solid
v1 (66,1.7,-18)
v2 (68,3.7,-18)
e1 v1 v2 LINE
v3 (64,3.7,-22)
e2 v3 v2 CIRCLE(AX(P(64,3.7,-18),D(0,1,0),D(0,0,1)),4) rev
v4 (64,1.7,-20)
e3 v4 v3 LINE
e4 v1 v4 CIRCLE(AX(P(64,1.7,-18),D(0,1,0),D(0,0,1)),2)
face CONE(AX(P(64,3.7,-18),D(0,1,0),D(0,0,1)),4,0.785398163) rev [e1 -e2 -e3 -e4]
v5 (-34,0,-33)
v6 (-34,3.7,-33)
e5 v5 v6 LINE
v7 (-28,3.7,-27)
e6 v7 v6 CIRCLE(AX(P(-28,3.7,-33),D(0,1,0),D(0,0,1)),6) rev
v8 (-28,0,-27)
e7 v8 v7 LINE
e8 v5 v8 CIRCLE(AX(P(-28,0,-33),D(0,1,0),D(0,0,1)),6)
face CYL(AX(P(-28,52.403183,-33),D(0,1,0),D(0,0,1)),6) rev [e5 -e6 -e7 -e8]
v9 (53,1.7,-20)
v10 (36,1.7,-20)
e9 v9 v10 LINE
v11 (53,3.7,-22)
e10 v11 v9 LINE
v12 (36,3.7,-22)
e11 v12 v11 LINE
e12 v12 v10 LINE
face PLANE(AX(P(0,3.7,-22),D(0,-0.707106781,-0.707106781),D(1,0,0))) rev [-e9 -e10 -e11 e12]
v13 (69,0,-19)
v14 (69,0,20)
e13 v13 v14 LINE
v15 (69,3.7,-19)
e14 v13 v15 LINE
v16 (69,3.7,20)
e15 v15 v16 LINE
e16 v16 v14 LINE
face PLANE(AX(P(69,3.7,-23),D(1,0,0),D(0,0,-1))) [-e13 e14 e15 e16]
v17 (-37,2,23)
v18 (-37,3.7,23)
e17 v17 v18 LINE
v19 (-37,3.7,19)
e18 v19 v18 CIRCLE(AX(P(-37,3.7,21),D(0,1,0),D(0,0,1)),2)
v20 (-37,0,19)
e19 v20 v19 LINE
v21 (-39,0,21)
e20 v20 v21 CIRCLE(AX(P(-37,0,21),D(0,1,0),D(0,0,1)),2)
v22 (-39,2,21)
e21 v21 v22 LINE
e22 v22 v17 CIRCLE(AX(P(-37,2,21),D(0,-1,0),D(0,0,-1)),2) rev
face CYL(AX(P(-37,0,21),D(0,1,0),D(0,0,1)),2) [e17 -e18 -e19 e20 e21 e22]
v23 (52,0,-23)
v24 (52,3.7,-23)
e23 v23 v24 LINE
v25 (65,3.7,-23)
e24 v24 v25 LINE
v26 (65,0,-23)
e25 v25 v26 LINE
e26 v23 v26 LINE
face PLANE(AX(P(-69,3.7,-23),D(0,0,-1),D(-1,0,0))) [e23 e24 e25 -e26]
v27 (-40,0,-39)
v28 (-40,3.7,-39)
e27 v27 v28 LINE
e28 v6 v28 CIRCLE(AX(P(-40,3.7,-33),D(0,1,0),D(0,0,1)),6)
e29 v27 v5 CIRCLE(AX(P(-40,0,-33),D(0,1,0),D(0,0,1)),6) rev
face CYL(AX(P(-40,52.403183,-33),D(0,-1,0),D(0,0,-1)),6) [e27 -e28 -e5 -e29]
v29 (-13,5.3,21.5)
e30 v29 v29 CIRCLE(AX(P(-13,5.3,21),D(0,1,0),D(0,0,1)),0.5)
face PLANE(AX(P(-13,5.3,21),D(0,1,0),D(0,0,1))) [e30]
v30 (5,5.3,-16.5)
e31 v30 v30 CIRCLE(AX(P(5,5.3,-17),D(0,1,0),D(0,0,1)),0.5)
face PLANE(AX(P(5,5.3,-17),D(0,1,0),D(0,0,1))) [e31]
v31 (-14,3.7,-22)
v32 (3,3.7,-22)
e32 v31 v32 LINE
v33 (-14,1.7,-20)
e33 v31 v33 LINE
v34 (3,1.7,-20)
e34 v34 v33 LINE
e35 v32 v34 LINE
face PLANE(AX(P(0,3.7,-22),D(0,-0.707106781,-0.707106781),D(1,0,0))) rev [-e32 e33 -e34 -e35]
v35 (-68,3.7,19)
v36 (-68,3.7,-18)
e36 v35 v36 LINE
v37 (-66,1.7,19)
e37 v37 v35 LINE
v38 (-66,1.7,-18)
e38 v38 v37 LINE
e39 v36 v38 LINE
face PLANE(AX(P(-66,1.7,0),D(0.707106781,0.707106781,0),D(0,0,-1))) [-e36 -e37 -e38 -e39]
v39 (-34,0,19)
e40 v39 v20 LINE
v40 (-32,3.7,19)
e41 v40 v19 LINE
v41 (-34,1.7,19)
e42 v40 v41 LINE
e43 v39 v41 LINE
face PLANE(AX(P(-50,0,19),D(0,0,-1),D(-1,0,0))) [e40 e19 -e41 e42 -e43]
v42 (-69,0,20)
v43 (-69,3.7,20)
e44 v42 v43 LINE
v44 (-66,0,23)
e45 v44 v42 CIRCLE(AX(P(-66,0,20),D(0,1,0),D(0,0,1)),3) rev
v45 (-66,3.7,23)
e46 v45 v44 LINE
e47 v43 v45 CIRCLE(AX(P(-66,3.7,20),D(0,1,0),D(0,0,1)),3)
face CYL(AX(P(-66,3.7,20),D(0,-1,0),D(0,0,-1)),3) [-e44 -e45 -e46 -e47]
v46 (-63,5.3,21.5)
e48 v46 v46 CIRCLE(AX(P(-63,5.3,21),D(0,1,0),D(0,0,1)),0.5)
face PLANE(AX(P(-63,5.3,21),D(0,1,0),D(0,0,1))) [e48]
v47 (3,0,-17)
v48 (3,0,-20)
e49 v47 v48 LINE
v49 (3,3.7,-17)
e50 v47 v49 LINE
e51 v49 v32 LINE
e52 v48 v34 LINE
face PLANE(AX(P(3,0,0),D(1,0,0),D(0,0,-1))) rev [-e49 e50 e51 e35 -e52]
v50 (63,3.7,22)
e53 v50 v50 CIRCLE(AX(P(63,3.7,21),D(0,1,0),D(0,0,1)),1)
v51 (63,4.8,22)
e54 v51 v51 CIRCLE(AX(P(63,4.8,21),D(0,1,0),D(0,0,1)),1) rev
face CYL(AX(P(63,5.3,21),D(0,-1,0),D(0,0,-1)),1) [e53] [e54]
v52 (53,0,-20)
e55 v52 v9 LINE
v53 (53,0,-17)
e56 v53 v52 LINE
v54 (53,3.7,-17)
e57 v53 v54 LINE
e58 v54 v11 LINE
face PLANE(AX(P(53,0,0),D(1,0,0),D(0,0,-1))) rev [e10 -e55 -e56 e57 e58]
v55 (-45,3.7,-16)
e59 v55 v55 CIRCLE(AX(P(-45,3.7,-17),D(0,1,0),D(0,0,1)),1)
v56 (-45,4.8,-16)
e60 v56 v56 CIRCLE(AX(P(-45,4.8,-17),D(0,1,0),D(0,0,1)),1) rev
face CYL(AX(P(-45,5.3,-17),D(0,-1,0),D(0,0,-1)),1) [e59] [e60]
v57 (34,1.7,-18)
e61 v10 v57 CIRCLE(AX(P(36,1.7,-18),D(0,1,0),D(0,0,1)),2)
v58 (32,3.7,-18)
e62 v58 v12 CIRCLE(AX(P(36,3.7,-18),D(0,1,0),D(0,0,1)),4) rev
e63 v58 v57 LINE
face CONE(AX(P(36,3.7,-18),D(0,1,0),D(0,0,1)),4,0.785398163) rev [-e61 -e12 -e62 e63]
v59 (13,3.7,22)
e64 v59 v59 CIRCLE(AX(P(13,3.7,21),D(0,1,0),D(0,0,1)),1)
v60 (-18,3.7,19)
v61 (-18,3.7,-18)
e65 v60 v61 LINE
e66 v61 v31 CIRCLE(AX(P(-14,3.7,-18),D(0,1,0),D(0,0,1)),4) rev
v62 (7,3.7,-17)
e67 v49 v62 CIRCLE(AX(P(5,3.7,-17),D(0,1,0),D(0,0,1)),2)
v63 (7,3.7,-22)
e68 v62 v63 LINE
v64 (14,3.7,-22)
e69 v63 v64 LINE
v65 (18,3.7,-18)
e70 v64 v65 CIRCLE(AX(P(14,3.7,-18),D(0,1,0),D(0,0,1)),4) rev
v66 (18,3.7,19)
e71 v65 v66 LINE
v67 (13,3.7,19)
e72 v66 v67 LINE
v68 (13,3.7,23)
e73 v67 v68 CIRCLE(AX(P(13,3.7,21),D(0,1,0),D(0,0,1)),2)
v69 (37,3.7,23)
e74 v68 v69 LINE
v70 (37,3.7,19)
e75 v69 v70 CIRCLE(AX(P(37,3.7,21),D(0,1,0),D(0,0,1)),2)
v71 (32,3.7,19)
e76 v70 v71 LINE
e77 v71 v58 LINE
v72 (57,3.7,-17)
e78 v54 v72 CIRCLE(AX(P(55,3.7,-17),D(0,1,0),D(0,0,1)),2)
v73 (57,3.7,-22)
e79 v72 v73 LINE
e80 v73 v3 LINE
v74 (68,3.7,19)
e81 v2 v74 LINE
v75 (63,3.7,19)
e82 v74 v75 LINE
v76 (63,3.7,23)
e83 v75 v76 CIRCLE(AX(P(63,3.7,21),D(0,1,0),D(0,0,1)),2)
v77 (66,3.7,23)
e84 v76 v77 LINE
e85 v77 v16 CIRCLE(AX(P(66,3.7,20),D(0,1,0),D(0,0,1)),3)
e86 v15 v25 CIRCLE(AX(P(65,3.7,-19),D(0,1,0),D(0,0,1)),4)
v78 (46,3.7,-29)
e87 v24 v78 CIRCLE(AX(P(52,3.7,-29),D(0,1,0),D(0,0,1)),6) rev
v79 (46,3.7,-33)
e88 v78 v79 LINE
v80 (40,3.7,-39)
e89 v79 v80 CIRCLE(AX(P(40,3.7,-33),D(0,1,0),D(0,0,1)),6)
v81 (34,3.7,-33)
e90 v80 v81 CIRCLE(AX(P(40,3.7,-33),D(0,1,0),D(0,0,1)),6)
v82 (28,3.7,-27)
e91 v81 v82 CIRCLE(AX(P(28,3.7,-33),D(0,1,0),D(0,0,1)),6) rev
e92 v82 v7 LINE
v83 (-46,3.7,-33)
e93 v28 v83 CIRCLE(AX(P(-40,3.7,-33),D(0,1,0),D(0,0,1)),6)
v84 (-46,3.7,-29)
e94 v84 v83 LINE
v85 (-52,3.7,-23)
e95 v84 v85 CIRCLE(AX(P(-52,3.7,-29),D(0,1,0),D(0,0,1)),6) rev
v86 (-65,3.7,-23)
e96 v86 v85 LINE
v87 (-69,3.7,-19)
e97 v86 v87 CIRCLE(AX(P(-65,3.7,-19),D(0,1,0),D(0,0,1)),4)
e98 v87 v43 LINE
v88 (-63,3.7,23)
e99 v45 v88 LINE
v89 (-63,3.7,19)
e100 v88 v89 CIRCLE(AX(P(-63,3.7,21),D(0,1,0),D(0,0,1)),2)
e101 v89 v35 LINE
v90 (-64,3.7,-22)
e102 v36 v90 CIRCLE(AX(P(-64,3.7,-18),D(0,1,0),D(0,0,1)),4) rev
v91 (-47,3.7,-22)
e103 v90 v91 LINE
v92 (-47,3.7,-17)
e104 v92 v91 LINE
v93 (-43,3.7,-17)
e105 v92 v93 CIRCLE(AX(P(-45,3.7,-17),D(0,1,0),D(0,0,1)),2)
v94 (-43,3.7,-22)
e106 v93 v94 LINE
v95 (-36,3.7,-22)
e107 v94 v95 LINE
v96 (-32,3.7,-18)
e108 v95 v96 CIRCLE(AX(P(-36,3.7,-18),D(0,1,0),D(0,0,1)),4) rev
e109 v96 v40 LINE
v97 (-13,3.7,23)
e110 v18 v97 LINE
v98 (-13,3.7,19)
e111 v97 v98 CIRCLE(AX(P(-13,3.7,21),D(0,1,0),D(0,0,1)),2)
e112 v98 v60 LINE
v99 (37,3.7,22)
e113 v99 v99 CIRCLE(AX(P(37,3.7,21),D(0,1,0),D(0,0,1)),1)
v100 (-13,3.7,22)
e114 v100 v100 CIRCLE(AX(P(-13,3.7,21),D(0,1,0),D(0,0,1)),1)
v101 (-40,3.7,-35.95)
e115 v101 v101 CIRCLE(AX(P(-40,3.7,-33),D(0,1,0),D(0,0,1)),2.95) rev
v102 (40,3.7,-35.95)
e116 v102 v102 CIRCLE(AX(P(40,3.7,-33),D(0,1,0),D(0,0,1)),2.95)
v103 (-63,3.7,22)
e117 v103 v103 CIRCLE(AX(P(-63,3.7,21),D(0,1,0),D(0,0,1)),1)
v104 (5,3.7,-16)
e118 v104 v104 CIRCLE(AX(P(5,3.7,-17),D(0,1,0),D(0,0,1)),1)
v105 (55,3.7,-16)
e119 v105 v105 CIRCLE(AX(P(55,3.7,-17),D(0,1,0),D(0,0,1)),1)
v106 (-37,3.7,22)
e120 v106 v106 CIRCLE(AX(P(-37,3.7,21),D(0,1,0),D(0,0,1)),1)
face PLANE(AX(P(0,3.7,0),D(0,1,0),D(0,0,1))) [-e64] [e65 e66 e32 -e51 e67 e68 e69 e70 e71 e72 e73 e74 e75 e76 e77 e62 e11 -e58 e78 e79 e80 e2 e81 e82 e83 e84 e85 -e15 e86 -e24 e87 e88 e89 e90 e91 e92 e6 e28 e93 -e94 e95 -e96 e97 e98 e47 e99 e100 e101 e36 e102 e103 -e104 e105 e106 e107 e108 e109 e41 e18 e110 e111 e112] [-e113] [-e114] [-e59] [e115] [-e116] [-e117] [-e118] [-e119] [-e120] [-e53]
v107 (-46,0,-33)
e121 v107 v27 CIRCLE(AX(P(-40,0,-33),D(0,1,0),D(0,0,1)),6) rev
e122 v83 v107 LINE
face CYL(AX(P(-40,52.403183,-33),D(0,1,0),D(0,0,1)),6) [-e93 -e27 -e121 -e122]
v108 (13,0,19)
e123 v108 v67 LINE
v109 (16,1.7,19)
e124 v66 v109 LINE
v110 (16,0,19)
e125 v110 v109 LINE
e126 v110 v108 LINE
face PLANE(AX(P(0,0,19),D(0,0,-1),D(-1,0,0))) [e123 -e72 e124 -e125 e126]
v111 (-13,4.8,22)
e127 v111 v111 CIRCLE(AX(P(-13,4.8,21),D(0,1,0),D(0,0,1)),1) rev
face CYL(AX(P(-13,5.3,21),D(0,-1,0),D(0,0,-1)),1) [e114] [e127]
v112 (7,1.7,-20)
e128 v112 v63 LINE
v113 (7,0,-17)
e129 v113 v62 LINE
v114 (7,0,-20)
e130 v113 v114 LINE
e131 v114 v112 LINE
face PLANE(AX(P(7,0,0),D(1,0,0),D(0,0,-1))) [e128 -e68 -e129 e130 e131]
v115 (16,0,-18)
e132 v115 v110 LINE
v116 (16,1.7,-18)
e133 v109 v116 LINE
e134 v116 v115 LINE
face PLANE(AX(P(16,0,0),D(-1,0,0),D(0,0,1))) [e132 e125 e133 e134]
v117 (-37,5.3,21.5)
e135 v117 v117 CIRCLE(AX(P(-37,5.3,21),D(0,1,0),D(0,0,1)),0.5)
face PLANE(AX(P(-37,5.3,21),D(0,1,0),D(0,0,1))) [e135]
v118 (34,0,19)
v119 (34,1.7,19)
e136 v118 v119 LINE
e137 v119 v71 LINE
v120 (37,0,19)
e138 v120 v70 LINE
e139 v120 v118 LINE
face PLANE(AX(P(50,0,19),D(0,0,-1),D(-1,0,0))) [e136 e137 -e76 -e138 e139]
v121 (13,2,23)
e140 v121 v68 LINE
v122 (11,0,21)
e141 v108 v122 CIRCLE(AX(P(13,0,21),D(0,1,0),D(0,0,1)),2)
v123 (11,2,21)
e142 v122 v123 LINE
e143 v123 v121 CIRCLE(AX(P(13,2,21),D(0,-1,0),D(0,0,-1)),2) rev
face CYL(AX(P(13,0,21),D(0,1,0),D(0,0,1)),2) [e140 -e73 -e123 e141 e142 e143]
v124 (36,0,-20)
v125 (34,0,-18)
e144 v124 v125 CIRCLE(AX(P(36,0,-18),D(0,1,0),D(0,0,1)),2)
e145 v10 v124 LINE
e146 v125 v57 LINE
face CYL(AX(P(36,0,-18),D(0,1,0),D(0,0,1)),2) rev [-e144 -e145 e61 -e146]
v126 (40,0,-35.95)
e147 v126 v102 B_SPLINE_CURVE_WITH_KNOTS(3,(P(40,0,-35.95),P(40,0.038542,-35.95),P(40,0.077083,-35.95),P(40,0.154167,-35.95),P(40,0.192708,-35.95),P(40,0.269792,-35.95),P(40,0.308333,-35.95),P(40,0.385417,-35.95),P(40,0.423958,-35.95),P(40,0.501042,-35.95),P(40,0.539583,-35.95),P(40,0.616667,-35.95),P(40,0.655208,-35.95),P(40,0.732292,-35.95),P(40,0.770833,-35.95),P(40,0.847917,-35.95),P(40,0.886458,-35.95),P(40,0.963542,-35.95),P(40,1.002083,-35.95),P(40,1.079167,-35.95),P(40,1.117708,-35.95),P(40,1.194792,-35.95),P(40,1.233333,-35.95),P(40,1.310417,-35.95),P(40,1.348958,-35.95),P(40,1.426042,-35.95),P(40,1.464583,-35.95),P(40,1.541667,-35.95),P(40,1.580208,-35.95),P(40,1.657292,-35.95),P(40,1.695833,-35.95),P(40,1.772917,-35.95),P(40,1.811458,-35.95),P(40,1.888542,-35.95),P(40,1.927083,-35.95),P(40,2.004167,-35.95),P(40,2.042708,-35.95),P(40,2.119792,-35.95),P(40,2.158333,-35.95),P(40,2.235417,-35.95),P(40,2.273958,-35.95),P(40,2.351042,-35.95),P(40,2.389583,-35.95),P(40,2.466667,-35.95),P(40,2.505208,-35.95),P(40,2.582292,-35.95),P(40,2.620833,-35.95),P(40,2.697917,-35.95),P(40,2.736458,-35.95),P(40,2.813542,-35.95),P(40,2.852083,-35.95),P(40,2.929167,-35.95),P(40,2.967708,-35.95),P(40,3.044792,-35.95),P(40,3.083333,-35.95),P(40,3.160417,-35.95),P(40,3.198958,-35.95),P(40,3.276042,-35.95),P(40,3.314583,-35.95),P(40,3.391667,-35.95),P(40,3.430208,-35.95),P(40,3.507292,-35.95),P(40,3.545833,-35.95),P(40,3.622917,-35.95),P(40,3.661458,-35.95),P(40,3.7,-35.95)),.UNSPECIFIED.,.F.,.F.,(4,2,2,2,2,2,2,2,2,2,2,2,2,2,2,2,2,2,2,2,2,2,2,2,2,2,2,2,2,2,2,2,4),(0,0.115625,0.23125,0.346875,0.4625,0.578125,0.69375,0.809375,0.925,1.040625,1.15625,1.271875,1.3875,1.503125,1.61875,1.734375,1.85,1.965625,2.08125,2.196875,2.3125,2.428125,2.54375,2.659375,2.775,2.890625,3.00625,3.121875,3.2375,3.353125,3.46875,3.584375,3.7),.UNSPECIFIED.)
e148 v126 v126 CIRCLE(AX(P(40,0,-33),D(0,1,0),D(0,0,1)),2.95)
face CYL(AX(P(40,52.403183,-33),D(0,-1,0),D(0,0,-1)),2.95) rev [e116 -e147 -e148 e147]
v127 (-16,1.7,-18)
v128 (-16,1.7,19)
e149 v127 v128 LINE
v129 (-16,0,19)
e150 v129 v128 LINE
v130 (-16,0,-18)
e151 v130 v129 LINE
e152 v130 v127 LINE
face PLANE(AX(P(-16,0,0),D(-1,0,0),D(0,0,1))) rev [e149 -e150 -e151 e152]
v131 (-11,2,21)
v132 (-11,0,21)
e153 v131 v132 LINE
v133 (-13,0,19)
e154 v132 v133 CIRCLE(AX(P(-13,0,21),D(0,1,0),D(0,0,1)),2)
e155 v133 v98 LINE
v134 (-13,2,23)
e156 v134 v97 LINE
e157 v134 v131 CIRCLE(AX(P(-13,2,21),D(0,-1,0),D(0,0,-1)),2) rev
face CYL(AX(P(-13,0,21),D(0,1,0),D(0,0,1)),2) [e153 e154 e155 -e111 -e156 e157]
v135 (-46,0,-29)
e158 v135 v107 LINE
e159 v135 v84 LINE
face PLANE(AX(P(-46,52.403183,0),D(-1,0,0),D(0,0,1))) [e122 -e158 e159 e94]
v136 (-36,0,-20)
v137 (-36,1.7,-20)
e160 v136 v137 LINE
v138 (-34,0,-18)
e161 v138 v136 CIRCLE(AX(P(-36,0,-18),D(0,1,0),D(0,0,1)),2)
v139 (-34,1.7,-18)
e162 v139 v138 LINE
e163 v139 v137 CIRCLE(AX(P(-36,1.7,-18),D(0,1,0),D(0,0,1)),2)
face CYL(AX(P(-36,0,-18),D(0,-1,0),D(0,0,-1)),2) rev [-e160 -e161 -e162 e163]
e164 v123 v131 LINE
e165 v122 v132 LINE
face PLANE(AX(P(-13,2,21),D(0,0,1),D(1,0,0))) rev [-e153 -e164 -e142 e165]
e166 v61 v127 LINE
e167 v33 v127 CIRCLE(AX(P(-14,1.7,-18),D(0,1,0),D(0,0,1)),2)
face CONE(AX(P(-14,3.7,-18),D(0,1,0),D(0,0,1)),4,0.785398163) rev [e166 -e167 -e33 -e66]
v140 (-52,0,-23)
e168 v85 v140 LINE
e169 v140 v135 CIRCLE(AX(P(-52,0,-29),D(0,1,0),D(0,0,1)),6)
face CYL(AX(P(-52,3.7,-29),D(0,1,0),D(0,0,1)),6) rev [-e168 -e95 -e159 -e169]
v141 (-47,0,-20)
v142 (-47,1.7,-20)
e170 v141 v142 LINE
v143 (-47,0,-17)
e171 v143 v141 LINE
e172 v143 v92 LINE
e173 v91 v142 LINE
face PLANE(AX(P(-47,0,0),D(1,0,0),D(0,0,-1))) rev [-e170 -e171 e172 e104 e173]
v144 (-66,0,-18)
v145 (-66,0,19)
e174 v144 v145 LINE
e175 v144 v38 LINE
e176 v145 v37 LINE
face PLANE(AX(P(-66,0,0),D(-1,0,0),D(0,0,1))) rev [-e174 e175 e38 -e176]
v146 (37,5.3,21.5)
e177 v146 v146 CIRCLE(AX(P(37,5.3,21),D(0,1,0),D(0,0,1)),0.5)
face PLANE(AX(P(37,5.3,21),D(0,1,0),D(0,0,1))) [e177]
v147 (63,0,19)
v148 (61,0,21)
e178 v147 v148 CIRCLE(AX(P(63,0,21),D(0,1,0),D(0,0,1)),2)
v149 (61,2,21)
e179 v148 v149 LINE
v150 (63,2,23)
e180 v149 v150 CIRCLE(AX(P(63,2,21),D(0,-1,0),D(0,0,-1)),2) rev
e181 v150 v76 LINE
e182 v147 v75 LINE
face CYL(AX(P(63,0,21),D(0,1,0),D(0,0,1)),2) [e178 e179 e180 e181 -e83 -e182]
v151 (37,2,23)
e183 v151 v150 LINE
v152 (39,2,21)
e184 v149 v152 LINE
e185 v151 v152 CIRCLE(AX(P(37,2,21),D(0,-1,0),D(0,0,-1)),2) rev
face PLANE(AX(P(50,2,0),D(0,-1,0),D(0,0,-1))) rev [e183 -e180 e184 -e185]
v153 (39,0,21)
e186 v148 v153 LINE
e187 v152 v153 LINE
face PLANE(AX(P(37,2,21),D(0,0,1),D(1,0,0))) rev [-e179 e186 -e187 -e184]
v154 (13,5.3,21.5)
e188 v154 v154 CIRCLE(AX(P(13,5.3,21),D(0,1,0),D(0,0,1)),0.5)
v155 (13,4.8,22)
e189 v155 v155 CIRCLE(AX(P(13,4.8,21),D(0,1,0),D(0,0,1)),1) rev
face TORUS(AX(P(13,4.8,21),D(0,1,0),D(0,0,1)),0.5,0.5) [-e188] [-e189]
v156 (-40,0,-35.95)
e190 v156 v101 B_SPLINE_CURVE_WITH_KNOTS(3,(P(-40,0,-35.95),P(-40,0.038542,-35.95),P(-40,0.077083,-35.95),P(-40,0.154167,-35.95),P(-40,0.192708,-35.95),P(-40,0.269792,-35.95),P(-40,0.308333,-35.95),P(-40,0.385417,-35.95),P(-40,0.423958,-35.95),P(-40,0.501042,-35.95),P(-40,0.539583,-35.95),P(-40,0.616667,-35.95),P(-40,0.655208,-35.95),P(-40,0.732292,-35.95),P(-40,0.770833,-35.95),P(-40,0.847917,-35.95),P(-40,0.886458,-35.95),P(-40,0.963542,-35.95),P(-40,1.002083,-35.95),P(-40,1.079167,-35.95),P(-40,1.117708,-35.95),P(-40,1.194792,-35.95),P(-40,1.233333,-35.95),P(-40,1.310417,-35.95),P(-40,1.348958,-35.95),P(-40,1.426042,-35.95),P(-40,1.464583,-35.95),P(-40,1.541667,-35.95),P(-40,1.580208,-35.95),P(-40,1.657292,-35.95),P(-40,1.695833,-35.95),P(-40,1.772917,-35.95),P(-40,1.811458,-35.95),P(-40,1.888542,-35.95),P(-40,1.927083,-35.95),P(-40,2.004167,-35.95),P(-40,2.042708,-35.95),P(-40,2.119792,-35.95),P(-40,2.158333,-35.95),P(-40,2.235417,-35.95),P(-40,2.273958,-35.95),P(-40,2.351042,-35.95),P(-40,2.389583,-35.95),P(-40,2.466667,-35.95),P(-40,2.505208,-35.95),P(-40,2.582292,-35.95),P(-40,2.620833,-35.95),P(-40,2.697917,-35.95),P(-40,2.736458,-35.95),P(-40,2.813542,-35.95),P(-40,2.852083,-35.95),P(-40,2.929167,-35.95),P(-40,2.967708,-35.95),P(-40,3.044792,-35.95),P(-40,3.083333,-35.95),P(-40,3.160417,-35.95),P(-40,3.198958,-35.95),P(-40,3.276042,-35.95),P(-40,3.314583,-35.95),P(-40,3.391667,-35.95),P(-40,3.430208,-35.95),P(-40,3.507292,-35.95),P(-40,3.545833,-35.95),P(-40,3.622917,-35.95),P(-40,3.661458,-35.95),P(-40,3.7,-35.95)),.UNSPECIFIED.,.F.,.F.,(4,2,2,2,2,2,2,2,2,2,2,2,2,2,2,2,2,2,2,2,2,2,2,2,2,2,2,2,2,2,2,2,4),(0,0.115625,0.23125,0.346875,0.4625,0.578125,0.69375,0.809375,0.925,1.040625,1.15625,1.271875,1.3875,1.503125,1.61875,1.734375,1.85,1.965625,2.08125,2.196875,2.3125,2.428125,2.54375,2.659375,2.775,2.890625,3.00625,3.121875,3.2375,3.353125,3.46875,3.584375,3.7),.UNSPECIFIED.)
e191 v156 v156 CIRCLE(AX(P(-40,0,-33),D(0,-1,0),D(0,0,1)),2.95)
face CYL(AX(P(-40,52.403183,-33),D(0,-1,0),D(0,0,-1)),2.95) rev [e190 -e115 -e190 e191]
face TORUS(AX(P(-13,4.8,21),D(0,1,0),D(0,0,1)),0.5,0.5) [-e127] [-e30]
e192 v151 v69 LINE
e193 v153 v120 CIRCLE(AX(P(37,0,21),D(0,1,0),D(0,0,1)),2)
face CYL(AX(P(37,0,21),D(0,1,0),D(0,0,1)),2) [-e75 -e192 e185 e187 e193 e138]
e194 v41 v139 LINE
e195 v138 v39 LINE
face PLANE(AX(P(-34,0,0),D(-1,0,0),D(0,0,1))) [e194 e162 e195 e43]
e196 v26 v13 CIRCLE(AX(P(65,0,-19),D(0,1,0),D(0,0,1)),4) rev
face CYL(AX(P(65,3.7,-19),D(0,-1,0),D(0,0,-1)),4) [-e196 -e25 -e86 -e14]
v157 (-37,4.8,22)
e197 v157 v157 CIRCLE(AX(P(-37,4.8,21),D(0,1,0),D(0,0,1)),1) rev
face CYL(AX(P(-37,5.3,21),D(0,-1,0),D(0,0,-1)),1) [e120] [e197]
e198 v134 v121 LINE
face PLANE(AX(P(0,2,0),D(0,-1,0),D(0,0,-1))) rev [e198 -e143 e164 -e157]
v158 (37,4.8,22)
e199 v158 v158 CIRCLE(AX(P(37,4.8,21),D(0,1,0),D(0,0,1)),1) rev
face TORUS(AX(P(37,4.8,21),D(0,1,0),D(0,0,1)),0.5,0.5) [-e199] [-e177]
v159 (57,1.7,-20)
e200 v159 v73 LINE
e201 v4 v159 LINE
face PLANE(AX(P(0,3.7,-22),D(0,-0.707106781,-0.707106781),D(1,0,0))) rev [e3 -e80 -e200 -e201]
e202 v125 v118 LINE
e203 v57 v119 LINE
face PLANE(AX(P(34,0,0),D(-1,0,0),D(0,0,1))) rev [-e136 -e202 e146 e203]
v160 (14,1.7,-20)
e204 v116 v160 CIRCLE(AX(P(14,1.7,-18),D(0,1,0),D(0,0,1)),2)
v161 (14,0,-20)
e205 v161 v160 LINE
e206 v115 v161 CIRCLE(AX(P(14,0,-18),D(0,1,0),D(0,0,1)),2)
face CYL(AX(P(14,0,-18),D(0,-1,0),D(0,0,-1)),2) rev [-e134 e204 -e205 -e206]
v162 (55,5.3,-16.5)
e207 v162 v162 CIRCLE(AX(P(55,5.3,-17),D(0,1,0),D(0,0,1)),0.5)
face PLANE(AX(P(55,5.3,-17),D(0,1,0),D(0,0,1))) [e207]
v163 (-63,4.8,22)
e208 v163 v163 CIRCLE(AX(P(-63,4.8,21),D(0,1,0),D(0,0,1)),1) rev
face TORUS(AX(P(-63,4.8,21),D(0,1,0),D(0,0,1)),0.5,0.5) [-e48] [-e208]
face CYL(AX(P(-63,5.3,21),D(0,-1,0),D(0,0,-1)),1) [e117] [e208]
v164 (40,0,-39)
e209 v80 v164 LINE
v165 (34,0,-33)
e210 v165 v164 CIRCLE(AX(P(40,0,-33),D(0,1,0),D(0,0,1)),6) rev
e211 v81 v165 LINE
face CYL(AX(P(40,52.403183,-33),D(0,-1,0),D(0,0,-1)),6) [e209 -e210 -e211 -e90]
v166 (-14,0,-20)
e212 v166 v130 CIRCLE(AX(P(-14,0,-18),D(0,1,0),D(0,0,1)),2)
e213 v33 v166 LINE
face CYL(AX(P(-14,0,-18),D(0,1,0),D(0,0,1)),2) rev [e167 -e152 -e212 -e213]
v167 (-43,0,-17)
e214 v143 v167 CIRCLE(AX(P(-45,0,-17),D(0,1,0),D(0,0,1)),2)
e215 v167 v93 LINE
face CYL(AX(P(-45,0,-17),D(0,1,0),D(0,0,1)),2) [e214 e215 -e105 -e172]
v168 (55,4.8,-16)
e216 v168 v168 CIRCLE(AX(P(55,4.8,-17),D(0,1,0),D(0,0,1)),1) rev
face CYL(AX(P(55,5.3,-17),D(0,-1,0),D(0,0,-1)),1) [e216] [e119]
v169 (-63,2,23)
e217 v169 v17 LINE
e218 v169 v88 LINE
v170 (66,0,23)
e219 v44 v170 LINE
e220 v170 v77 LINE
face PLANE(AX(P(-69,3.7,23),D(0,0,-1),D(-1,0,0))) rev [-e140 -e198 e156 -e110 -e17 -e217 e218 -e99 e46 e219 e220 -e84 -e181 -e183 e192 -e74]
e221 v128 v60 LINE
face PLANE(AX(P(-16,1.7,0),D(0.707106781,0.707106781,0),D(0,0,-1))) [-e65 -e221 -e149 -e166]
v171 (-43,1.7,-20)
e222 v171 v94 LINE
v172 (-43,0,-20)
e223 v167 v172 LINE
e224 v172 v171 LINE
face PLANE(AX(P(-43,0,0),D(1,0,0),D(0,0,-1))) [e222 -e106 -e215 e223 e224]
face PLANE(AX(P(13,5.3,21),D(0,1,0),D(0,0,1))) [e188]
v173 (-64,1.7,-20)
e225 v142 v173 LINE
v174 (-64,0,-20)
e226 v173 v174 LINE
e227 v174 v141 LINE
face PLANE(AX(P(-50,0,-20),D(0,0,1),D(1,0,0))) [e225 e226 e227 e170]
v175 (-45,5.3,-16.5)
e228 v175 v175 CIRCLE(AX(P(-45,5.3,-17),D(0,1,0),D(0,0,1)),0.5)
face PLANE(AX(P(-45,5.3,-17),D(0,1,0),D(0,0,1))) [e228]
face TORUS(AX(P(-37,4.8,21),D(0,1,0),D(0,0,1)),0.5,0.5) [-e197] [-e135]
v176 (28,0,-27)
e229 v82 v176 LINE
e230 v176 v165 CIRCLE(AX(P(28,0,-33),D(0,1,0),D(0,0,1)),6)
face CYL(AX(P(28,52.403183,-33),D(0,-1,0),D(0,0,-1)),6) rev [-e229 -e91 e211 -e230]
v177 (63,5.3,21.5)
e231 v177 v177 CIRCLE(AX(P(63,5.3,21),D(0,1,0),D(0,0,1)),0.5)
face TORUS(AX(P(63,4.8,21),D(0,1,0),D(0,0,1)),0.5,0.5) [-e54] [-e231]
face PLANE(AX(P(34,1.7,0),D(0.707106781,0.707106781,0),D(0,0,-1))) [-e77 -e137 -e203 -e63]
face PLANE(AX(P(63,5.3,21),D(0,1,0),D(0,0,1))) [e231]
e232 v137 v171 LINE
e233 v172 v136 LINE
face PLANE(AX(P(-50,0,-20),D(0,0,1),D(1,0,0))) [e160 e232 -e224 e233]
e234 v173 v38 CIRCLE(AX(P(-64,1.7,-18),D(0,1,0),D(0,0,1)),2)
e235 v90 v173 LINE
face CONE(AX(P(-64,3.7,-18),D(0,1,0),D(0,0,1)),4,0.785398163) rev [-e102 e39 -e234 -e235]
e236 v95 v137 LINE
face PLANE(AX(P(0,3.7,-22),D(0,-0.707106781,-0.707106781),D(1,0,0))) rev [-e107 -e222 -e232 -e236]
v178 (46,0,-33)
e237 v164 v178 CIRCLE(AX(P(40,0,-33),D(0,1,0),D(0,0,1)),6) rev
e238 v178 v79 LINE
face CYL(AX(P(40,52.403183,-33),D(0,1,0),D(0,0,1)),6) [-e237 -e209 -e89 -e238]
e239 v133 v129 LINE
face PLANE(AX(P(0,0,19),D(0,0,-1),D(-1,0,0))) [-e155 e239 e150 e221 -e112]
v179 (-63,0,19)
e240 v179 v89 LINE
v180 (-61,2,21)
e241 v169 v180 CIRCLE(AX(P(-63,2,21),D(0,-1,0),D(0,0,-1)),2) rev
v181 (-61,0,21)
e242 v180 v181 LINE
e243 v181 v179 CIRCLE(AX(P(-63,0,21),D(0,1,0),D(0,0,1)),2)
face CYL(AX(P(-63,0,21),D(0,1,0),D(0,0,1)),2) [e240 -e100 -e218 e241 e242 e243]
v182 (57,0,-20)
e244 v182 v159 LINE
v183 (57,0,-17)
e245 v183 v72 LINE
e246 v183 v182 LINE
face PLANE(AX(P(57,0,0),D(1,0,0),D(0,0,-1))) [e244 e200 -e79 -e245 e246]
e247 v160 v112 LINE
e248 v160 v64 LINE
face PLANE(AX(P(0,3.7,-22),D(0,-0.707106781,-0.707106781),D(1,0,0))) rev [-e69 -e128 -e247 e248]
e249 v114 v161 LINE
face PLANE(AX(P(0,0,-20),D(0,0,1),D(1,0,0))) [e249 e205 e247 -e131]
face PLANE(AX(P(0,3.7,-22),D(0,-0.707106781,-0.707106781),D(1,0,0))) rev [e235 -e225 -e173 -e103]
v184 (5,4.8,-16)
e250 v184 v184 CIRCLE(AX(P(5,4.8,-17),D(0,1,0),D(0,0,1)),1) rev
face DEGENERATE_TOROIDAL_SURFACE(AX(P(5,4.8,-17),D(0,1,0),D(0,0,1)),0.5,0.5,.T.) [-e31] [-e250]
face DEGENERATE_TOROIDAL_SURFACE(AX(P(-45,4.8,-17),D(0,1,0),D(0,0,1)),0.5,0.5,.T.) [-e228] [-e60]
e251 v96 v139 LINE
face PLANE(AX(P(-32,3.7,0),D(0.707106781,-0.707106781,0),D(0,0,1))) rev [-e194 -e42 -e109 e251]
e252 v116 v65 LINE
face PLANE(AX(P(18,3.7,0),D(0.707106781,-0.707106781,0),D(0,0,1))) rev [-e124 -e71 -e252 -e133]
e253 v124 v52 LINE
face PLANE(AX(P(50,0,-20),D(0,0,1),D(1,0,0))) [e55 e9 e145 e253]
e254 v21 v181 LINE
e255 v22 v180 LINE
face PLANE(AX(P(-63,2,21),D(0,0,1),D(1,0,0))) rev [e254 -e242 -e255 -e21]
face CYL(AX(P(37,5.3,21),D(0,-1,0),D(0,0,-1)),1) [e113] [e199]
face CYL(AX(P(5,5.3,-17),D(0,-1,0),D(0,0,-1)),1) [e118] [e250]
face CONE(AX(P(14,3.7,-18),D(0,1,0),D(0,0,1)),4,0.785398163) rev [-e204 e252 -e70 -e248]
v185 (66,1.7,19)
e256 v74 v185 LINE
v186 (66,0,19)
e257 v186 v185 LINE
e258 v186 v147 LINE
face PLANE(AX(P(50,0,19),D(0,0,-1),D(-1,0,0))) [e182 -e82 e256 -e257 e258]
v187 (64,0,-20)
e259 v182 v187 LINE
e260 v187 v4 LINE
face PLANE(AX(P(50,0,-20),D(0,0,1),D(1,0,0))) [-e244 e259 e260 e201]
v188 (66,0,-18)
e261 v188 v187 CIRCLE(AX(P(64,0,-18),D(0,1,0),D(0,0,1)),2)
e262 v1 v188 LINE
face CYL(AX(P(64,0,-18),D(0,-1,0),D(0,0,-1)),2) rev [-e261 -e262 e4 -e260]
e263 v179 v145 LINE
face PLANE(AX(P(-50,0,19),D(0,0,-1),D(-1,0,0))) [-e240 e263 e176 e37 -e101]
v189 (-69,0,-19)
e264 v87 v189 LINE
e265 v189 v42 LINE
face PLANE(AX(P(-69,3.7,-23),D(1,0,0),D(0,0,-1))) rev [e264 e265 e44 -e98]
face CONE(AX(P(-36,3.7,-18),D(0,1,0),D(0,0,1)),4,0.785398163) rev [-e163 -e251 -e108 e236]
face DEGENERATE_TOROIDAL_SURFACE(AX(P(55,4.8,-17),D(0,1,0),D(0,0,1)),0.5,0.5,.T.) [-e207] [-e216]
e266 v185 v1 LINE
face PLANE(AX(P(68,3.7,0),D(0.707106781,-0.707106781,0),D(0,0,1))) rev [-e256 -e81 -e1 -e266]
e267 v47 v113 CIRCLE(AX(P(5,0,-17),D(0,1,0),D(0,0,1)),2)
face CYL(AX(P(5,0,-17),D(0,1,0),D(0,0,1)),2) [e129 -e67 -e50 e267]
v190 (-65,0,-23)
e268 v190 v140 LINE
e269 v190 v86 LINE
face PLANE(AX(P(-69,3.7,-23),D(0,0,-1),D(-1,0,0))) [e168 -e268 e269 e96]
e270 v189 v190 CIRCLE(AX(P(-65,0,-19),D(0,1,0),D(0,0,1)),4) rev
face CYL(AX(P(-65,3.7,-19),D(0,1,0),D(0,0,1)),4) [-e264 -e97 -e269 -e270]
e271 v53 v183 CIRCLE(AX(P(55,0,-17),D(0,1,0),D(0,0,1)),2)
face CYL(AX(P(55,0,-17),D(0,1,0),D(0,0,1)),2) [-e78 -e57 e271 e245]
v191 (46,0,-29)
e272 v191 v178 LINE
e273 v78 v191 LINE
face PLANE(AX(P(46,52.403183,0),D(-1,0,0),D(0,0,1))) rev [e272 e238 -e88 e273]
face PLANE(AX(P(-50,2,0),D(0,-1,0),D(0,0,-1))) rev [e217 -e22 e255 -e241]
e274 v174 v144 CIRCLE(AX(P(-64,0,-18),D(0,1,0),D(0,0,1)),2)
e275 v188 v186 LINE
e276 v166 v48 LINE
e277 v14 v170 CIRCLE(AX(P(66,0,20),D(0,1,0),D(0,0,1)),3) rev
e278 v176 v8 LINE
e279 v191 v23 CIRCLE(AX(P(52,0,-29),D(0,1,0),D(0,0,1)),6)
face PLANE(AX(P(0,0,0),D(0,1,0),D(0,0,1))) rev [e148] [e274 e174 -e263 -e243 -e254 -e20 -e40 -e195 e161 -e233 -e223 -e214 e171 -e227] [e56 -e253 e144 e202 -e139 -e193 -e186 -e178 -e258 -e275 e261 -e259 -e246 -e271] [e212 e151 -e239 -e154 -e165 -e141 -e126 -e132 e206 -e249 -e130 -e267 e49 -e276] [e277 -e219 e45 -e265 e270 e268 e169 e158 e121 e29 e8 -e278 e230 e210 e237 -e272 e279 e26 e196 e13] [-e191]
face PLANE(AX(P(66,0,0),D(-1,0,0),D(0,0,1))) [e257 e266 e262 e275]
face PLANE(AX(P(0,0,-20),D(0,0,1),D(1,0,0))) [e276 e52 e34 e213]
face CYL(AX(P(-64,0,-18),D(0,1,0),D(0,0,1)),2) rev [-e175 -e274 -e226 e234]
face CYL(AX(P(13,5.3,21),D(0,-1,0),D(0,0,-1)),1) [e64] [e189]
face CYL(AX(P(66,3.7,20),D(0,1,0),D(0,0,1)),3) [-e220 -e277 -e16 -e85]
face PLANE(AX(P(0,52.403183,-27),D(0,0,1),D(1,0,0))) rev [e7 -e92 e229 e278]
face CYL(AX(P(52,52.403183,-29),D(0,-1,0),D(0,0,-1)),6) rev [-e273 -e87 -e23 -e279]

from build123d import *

# Parameters (mm, degrees)
SKETCH1_W                  = 138
SKETCH1_H                  = 46
BOSS_EXTRUDE1_DEPTH        = 3.7
SKETCH2_W                  = 34
SKETCH2_H                  = 4
BOSS_EXTRUDE2_DEPTH        = 3.7
FILLET1_R                  = 6
FILLET1_OF_MIRROR1_R       = 6
CUT_EXTRUDE1_DEPTH         = 80.345384239
FILLET2_R                  = 2
SKETCH4_R                  = 1
BOSS_EXTRUDE3_DEPTH        = 1.6
FILLET3_R                  = 0.5
SKETCH5_W                  = 26
SKETCH5_H                  = 2
BOSS_EXTRUDE4_DEPTH        = 2
LPATTERN1_COUNT            = 2
LPATTERN1_PITCH            = 50
FILLET2_OF_LPATTERN1_R     = 2
FILLET3_OF_LPATTERN1_R     = 0.5
LPATTERN1_COL_COUNT        = 2
LPATTERN1_COL_PITCH        = 50
FILLET2_OF_LPATTERN1_COL_R = 2
FILLET3_OF_LPATTERN1_COL_R = 0.5
FILLET4_R                  = 4
FILLET5_R                  = 3
CHAMFER1_SIZE              = 2


with BuildPart() as part:
    # Sketch1 → Boss-Extrude1 (new body)
    with BuildSketch(Plane(origin=(0, 0, 0), x_dir=(1, 0, 0), z_dir=(0, 1, 0))):
        Rectangle(SKETCH1_W, SKETCH1_H)
    extrude(amount=BOSS_EXTRUDE1_DEPTH)

    # Sketch2 → Boss-Extrude2 (add)
    with BuildSketch(Plane(origin=(0, 0, 0), x_dir=(1, 0, 0), z_dir=(0, 1, 0))):
        with Locations((17, 25)):
            Rectangle(SKETCH2_W, SKETCH2_H)
        with BuildLine():
            Line((34, 27), (34, 23))
            Line((34, 23), (40, 23))
            Line((40, 23), (40, 30.05))
            ThreePointArc((40, 30.05), (37.05, 33), (40, 35.95))
            Line((40, 35.95), (40, 39))
            Line((40, 39), (34, 39))
            Line((34, 39), (34, 27))
        make_face()
        with BuildLine():
            Line((40, 30.05), (40, 23))
            Line((40, 23), (46, 23))
            Line((46, 23), (46, 39))
            Line((46, 39), (40, 39))
            Line((40, 39), (40, 35.95))
            ThreePointArc((40, 35.95), (42.085965005, 35.085965005), (42.95, 33))
            ThreePointArc((42.95, 33), (42.085965005, 30.914034995), (40, 30.05))
        make_face()
    boss_extrude2 = extrude(amount=BOSS_EXTRUDE2_DEPTH)

    # Fillet1
    fillet1_edges = [part.edges().sort_by_distance(p)[0] for p in [
        (46, 1.85, -23),
        (34, 1.85, -27),
    ]]
    fillet(fillet1_edges, radius=FILLET1_R)
    fillet1_2_edges = [part.edges().sort_by_distance(p)[0] for p in [
        (34, 1.85, -39),
        (46, 1.85, -39),
    ]]
    fillet(fillet1_2_edges, radius=FILLET1_R - 0.0001)  # a hair under: the kernel refuses the full size

    # Mirror1: Boss-Extrude2 across plane
    add(boss_extrude2.mirror(Plane(origin=(0, 0, 0), x_dir=(0, 0, 1), z_dir=(1, 0, 0))))

    # Fillet1 of Mirror1
    fillet1_of_mirror1_edges = [part.edges().sort_by_distance(p)[0] for p in [
        (-46, 1.85, -23),
        (-34, 1.85, -27),
    ]]
    fillet(fillet1_of_mirror1_edges, radius=FILLET1_OF_MIRROR1_R)
    fillet1_of_mirror1_2_edges = [part.edges().sort_by_distance(p)[0] for p in [
        (-34, 1.85, -39),
        (-46, 1.85, -39),
    ]]
    fillet(fillet1_of_mirror1_2_edges, radius=FILLET1_OF_MIRROR1_R - 0.0001)  # a hair under: the kernel refuses the full size

    # Sketch3 → Cut-Extrude1 (cut, through all)
    with BuildSketch(Plane(origin=(0, 3.7, 0), x_dir=(1, 0, 0), z_dir=(0, 1, 0))):
        with BuildLine():
            Line((3, 20), (-16, 20))
            Line((-16, 20), (-16, -19))
            Line((-16, -19), (-13, -19))
            ThreePointArc((-13, -19), (-11.585786438, -19.585786438), (-11, -21))
            ThreePointArc((-11, -21), (-11.585786438, -22.414213562), (-13, -23))
            Line((-13, -23), (12.999999988, -23))
            ThreePointArc((12.999999988, -23), (11, -20.999999994), (13, -19))
            Line((13, -19), (16, -19))
            Line((16, -19), (16, 20))
            Line((16, 20), (7, 20))
            Line((7, 20), (7, 17))
            ThreePointArc((7, 17), (5, 15), (3, 17))
            Line((3, 17), (3, 20))
        make_face()
    cut_extrude1 = extrude(amount=-CUT_EXTRUDE1_DEPTH, mode=Mode.SUBTRACT)

    # Fillet2
    fillet2_edges = [part.edges().sort_by_distance(p)[0] for p in [
        (16, 1.85, -20),
        (-16, 1.85, -20),
    ]]
    fillet(fillet2_edges, radius=FILLET2_R)

    # Sketch4 → Boss-Extrude3 (add)
    with BuildSketch(Plane(origin=(0, 3.7, 0), x_dir=(1, 0, 0), z_dir=(0, 1, 0))):
        with Locations(Location((5, 17, 0), (0, 0, 270))):
            Circle(SKETCH4_R)
        with Locations(Location((13, -21, 0), (0, 0, 270))):
            Circle(SKETCH4_R)
        with Locations(Location((-13, -21, 0), (0, 0, 270))):
            Circle(SKETCH4_R)
    boss_extrude3 = extrude(amount=BOSS_EXTRUDE3_DEPTH)

    # Fillet3
    fillet3_edges = [part.edges().sort_by_distance(p)[0] for p in [
        (5, 5.3, -18),
        (13, 5.3, 20),
        (-13, 5.3, 20),
    ]]
    fillet(fillet3_edges, radius=FILLET3_R)

    # Sketch5 → Boss-Extrude4 (add)
    with BuildSketch(Plane(origin=(0, 0, 0), x_dir=(1, 0, 0), z_dir=(0, 1, 0))):
        with Locations((0, -22)):
            Rectangle(SKETCH5_W, SKETCH5_H)
    boss_extrude4 = extrude(amount=BOSS_EXTRUDE4_DEPTH)

    # LPattern1: Cut-Extrude1, Boss-Extrude3, Boss-Extrude4 ×2
    with Locations(*[(i * LPATTERN1_PITCH, 0, 0) for i in range(1, LPATTERN1_COUNT)]):
        add(cut_extrude1, mode=Mode.SUBTRACT)
        add(boss_extrude3)
        add(boss_extrude4)

    # Fillet2 of LPattern1
    fillet2_of_lpattern1_edges = [part.edges().sort_by_distance(p)[0] for p in [
        (66, 1.85, -20),
        (34, 1.85, -20),
    ]]
    fillet(fillet2_of_lpattern1_edges, radius=FILLET2_OF_LPATTERN1_R)

    # Fillet3 of LPattern1
    fillet3_of_lpattern1_edges = [part.edges().sort_by_distance(p)[0] for p in [
        (55, 5.3, -18),
        (63, 5.3, 20),
        (37, 5.3, 20),
    ]]
    fillet(fillet3_of_lpattern1_edges, radius=FILLET3_OF_LPATTERN1_R)

    # LPattern1 col: Cut-Extrude1, Boss-Extrude3, Boss-Extrude4 ×2
    with Locations(*[(-i * LPATTERN1_COL_PITCH, 0, 0) for i in range(1, LPATTERN1_COL_COUNT)]):
        add(cut_extrude1, mode=Mode.SUBTRACT)
        add(boss_extrude3)
        add(boss_extrude4)

    # Fillet2 of LPattern1 col
    fillet2_of_lpattern1_col_edges = [part.edges().sort_by_distance(p)[0] for p in [
        (-34, 1.85, -20),
        (-66, 1.85, -20),
    ]]
    fillet(fillet2_of_lpattern1_col_edges, radius=FILLET2_OF_LPATTERN1_COL_R)

    # Fillet3 of LPattern1 col
    fillet3_of_lpattern1_col_edges = [part.edges().sort_by_distance(p)[0] for p in [
        (-45, 5.3, -18),
        (-37, 5.3, 20),
        (-63, 5.3, 20),
    ]]
    fillet(fillet3_of_lpattern1_col_edges, radius=FILLET3_OF_LPATTERN1_COL_R)

    # Fillet4
    fillet4_edges = [part.edges().sort_by_distance(p)[0] for p in [
        (-69, 1.85, -23),
        (69, 1.85, -23),
    ]]
    fillet(fillet4_edges, radius=FILLET4_R)

    # Fillet5
    fillet5_edges = [part.edges().sort_by_distance(p)[0] for p in [
        (69, 1.85, 23),
        (-69, 1.85, 23),
    ]]
    fillet(fillet5_edges, radius=FILLET5_R)

    # Chamfer1
    chamfer1_edges = [part.edges().sort_by_distance(p)[0] for p in [
        (10.5, 3.7, -20),
        (16, 3.7, 0.5),
        (-16, 3.7, 0.5),
        (-5.5, 3.7, -20),
        (15.414213562, 3.7, -19.414213562),
        (-15.414213562, 3.7, -19.414213562),
        (-39.5, 3.7, -20),
        (60.5, 3.7, -20),
        (-34, 3.7, 0.5),
        (-66, 3.7, 0.5),
        (-55.5, 3.7, -20),
        (-34.585786438, 3.7, -19.414213562),
        (-65.414213562, 3.7, -19.414213562),
        (66, 3.7, 0.5),
        (34, 3.7, 0.5),
        (44.5, 3.7, -20),
        (65.414213562, 3.7, -19.414213562),
        (34.585786438, 3.7, -19.414213562),
    ]]
    chamfer(chamfer1_edges, length=CHAMFER1_SIZE)


solid = part.part
